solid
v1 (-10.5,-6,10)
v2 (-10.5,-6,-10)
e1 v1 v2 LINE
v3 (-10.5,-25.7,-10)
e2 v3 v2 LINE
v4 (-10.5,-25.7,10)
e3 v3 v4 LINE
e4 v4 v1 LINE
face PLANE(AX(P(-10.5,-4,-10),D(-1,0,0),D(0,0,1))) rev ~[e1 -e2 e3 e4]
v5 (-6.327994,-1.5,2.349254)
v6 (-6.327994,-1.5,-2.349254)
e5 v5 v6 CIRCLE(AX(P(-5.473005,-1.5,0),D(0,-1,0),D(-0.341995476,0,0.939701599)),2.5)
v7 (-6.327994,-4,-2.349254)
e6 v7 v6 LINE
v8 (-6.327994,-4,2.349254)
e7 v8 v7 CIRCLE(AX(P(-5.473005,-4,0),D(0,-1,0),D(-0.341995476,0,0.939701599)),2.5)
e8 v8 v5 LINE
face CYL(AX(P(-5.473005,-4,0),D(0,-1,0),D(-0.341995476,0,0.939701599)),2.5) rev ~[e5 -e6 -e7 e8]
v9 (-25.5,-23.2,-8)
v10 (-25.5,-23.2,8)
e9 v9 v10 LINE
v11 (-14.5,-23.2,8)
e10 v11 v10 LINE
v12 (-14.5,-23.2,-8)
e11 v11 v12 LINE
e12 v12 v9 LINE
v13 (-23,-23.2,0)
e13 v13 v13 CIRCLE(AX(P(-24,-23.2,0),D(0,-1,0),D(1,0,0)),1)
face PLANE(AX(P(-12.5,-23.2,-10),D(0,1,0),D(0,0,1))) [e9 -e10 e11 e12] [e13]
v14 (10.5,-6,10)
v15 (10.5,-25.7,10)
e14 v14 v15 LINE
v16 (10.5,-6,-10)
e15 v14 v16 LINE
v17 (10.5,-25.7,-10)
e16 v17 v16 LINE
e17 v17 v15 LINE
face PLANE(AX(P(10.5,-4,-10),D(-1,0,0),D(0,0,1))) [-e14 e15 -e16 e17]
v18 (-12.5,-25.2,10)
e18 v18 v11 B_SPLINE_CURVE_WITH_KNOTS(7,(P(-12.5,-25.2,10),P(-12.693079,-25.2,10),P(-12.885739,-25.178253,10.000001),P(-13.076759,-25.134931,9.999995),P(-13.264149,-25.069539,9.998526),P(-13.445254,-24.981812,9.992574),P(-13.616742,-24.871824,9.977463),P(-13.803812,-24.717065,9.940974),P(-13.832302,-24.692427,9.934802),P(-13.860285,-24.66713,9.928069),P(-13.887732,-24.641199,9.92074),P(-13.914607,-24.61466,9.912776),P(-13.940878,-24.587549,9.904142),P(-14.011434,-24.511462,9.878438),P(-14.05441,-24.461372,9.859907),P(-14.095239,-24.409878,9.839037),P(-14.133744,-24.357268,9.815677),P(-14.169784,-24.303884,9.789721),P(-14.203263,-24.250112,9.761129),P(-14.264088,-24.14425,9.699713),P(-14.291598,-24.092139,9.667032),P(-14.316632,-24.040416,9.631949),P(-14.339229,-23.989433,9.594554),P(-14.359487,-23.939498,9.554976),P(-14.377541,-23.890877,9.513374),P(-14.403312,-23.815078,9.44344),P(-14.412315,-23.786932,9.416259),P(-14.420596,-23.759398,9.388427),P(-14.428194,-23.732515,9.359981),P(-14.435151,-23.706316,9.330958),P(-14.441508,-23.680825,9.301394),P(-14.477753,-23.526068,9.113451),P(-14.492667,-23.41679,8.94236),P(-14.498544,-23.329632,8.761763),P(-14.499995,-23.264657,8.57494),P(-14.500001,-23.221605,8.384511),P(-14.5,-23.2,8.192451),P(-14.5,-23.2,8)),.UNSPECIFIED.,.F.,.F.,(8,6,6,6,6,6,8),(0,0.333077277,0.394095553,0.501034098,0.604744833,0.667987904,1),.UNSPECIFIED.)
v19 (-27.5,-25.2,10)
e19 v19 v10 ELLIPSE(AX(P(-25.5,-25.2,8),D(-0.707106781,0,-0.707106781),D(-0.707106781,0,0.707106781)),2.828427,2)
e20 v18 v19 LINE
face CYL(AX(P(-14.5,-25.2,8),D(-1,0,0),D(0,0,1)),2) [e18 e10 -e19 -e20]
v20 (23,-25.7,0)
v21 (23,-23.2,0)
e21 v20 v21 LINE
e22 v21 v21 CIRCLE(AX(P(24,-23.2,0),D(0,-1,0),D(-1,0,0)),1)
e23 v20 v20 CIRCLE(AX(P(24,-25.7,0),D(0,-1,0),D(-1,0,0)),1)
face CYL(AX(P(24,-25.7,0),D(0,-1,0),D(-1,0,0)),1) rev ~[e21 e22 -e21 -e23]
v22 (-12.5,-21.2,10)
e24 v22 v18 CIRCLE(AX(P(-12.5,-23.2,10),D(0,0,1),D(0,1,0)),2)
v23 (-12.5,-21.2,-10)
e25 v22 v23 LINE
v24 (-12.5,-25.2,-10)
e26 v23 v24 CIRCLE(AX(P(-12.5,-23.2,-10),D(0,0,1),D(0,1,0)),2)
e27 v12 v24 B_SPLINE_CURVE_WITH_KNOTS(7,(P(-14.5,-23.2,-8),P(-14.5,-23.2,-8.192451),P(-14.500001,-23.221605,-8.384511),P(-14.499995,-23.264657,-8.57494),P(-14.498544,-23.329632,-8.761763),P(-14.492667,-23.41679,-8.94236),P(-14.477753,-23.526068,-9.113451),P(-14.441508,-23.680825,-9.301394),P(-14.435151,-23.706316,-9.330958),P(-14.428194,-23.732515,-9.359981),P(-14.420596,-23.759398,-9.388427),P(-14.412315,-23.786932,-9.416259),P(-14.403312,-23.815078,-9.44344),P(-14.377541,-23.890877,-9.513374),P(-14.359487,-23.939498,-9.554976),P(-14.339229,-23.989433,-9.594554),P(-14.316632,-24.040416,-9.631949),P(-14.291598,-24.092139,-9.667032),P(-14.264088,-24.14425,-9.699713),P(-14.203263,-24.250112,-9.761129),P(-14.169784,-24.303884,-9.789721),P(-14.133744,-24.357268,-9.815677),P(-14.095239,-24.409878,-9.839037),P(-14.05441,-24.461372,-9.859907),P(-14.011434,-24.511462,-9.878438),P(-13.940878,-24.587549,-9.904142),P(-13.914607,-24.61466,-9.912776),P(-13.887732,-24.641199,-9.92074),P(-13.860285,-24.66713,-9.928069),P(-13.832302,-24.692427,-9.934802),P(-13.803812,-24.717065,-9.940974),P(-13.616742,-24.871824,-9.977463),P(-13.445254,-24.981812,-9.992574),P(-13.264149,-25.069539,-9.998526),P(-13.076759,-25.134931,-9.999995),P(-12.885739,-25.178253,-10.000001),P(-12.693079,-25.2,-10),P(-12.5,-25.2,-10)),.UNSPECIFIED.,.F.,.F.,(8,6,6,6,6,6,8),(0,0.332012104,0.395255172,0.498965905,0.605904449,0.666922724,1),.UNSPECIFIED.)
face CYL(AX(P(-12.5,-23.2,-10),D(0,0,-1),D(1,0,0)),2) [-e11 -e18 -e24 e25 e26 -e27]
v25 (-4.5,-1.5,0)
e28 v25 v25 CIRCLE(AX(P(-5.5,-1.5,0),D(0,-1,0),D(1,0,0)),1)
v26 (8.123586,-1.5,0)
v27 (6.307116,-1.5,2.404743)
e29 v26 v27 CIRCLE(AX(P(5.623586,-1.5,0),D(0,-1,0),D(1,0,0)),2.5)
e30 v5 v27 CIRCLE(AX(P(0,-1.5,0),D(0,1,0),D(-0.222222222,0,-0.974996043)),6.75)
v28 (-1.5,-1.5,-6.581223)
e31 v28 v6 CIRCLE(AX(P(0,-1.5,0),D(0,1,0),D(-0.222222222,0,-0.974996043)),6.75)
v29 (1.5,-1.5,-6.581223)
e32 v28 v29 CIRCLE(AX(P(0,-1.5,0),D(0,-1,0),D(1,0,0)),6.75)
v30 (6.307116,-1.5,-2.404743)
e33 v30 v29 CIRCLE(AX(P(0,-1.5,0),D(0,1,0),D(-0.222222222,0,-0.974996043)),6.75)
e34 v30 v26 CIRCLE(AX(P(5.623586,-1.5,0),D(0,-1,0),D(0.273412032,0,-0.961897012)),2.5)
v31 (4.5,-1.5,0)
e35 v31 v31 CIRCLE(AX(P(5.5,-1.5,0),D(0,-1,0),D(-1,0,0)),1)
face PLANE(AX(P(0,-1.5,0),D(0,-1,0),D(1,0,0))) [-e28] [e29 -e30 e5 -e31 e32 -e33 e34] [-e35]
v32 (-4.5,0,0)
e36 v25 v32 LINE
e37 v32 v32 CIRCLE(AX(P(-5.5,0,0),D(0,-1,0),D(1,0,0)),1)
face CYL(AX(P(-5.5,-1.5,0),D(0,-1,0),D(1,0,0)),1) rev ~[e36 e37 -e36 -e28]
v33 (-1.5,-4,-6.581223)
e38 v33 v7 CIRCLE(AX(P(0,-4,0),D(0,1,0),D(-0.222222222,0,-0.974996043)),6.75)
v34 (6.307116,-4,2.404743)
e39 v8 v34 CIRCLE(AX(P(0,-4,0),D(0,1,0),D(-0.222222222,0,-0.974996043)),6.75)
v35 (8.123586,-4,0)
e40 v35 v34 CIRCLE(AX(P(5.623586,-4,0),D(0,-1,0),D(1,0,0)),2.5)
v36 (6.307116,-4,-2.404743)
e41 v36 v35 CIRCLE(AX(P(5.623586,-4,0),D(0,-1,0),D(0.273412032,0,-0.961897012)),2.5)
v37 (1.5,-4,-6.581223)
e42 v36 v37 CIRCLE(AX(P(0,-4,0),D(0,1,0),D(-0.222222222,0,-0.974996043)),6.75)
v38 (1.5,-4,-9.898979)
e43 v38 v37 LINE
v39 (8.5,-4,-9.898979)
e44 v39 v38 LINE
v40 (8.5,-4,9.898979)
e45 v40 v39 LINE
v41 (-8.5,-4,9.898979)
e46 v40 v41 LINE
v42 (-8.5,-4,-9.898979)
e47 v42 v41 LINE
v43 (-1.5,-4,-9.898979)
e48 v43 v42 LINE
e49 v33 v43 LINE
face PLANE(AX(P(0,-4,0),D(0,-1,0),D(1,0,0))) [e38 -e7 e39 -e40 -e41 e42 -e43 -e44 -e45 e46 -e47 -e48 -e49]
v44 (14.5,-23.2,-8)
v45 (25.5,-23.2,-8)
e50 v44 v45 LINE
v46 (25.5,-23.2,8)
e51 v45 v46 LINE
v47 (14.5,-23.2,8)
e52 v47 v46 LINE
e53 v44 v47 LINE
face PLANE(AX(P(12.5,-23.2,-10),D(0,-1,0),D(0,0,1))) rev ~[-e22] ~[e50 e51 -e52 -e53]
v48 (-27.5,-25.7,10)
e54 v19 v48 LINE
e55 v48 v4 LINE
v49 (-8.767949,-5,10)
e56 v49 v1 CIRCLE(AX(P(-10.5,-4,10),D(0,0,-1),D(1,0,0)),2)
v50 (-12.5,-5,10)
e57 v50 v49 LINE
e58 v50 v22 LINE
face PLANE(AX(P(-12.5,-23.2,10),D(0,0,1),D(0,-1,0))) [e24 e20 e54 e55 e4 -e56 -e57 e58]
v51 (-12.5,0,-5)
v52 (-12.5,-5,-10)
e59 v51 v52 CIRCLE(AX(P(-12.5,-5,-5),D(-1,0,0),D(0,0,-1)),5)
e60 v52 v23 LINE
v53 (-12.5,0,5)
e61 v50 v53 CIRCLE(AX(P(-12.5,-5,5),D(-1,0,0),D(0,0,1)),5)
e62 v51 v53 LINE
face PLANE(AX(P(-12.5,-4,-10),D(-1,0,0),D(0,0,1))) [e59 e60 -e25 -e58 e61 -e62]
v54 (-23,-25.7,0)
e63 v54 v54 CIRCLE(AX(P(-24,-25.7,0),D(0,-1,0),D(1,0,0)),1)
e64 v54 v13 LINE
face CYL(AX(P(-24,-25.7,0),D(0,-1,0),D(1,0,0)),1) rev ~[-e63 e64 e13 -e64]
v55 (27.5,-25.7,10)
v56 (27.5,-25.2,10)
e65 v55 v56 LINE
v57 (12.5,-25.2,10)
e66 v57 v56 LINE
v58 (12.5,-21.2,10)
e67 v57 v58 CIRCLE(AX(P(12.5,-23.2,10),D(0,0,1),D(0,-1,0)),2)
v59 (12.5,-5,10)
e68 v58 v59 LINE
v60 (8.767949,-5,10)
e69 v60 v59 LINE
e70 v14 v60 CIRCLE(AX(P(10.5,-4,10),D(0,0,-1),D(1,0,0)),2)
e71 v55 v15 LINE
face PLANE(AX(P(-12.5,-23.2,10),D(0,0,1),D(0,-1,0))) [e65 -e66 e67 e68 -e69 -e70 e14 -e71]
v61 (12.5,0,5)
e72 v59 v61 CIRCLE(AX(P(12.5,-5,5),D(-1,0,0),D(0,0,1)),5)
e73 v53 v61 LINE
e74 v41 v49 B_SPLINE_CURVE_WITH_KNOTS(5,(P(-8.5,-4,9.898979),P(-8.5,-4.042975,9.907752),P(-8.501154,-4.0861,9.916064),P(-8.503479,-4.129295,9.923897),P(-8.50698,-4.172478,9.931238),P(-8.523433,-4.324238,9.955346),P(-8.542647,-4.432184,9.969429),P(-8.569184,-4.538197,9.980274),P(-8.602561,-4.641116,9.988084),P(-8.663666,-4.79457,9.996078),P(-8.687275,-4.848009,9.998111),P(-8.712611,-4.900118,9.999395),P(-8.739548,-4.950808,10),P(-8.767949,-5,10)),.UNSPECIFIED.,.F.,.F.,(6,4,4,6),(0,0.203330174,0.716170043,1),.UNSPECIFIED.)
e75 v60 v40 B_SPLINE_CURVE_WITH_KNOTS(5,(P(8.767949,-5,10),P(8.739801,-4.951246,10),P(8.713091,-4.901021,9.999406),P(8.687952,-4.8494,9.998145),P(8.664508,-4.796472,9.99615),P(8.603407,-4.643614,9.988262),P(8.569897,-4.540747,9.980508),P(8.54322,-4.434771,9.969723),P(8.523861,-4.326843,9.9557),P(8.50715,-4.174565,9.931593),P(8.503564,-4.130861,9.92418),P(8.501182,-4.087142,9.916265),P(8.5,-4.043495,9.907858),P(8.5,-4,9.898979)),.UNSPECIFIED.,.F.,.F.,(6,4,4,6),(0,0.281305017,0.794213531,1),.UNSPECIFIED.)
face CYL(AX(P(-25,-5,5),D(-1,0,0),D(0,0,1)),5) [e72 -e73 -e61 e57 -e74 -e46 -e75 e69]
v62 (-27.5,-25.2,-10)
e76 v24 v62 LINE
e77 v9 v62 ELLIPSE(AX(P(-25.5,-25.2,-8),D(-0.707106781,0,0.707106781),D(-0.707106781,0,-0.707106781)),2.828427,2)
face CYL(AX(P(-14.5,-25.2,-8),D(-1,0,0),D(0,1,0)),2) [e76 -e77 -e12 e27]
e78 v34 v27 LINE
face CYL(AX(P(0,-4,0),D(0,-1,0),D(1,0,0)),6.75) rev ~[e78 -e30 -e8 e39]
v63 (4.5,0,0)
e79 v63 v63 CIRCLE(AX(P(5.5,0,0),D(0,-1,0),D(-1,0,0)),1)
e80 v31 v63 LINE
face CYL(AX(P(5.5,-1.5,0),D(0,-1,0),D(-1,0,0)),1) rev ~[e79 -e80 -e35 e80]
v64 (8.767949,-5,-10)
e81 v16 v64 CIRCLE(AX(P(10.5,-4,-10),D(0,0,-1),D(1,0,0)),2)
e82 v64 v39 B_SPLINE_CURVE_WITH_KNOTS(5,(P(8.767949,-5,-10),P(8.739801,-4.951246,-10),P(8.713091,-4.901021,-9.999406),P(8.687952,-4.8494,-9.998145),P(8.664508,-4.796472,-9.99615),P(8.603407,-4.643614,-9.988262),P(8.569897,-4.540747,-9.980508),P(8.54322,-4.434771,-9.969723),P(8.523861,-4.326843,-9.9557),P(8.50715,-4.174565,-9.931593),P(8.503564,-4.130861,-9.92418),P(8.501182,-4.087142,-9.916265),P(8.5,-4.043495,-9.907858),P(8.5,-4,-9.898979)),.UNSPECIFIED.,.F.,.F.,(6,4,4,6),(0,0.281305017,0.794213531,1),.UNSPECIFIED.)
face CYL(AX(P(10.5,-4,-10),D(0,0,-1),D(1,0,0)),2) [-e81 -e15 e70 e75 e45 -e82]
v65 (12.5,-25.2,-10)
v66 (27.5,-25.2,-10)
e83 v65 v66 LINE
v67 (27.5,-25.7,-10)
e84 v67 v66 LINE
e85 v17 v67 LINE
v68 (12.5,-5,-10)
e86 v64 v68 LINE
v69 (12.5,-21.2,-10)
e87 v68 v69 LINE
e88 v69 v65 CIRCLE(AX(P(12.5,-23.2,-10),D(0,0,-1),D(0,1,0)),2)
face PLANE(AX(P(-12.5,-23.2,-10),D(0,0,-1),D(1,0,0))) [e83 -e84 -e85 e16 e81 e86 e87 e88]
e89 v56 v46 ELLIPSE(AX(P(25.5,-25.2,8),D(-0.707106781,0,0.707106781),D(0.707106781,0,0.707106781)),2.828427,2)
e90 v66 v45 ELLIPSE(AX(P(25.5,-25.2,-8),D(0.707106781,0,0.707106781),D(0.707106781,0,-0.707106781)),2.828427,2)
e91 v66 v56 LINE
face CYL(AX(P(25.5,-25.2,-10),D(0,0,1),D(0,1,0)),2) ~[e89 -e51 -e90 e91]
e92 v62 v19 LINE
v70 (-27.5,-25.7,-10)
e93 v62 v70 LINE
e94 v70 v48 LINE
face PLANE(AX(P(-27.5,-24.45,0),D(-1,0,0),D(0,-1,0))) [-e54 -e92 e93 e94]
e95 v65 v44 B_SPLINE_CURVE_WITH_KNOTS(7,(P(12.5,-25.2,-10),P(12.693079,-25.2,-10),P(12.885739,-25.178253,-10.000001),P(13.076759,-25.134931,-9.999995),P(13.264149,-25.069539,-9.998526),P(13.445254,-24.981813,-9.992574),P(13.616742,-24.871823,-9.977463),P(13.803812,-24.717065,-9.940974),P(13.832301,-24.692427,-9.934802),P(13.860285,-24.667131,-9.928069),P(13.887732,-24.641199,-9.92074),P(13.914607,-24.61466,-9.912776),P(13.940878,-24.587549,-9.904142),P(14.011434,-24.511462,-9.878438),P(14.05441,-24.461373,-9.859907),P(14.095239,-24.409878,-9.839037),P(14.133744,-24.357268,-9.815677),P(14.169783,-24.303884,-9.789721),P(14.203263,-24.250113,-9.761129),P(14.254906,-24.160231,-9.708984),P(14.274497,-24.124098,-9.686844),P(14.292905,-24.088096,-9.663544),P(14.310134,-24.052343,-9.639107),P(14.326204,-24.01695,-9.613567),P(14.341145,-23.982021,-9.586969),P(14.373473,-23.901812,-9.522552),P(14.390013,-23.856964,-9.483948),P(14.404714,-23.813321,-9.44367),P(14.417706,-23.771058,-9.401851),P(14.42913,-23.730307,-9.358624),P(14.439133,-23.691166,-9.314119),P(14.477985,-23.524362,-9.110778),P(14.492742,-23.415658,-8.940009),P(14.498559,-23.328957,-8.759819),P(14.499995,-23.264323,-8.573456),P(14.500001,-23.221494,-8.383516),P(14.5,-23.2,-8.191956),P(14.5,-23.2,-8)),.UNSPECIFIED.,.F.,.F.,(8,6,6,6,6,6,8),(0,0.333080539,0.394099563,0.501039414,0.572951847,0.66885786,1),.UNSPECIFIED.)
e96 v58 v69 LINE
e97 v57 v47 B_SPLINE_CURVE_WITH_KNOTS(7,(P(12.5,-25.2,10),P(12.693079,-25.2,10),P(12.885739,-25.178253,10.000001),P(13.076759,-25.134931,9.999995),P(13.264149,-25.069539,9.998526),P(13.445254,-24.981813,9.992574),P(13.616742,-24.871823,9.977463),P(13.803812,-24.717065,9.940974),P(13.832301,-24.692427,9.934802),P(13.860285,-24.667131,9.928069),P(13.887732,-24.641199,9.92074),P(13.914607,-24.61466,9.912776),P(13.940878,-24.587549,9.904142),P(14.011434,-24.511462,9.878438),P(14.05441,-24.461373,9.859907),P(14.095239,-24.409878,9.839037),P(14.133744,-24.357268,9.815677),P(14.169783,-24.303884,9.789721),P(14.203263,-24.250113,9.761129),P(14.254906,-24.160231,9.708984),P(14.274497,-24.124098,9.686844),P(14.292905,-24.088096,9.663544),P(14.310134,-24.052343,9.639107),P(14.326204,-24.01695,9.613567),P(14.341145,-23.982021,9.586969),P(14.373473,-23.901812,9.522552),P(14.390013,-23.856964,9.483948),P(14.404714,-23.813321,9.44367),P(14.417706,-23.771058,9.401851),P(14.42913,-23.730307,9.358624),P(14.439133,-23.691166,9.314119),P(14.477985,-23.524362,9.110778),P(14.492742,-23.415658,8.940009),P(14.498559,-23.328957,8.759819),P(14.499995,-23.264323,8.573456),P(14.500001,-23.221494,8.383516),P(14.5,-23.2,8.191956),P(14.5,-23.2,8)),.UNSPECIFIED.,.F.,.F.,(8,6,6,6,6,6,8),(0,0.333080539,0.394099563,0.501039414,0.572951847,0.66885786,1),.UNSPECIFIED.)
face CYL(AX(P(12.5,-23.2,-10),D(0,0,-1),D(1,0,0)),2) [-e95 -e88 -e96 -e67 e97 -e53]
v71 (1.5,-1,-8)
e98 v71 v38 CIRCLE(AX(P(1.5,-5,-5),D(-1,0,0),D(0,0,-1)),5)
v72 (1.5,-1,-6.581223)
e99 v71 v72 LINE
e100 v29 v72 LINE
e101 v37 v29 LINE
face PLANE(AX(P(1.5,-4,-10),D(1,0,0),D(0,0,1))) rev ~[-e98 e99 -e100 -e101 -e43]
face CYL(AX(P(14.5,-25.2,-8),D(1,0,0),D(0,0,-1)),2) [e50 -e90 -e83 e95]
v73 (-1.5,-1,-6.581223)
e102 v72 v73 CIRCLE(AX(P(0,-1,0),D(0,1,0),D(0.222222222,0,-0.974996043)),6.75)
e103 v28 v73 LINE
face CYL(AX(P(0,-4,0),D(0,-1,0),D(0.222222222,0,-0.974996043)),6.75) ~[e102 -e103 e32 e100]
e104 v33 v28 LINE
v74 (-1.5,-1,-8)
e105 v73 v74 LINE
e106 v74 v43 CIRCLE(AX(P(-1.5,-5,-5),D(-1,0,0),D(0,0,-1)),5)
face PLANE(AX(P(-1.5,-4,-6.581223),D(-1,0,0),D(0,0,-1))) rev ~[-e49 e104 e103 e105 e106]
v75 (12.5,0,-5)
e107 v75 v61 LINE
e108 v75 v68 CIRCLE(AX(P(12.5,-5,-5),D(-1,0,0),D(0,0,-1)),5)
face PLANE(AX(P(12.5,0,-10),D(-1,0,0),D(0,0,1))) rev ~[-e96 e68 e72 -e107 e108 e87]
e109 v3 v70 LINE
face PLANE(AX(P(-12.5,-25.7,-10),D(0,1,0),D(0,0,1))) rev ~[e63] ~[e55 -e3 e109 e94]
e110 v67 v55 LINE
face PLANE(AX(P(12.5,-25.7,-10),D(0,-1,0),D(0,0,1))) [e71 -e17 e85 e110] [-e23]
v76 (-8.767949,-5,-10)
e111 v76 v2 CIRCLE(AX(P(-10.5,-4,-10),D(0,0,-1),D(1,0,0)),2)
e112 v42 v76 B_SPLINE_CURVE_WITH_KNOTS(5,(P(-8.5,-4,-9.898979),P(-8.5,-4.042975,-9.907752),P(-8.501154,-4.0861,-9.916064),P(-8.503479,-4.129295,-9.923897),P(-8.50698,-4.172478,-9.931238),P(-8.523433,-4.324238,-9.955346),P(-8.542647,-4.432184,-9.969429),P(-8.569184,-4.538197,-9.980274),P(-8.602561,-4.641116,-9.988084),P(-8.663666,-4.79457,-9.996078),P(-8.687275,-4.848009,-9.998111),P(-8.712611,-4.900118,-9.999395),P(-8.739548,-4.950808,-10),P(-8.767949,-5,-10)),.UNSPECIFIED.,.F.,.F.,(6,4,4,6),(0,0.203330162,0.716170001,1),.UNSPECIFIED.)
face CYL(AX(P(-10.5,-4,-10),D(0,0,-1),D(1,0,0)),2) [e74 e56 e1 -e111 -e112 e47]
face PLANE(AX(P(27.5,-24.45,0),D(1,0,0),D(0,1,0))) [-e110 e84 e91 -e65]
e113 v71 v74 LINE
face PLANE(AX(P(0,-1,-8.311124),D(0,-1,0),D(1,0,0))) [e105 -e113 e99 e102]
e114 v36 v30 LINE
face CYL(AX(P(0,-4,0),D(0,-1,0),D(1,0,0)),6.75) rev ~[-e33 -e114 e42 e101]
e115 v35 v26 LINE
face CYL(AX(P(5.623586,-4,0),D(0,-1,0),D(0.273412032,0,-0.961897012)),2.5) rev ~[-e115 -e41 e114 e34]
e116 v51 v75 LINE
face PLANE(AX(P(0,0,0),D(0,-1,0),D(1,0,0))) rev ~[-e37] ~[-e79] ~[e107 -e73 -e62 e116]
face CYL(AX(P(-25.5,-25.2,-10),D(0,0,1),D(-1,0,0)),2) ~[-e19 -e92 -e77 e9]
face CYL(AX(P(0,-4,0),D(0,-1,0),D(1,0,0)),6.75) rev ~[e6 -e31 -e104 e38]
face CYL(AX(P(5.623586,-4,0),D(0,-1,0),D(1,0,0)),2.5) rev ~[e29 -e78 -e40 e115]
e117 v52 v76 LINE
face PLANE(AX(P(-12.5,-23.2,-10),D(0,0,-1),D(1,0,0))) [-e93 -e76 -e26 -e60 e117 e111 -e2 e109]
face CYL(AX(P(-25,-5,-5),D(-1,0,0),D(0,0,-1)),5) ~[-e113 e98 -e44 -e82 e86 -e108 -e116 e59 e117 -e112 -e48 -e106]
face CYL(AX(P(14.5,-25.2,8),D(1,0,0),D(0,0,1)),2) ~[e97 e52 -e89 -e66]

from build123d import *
from build123d import SkipClean  # not in build123d's __all__

# Parameters (mm, degrees)
F0_W         = 25
F0_H         = 20
F1_DEPTH     = 4
F2_R         = 6.75
F3_DEPTH     = 2.5
F5_DEPTH     = 3
F6_R         = 1
F7_DEPTH     = 25
F9_DEPTH     = 2.5
F10_W        = 2
F10_H        = 20
F11_DEPTH    = 21.7
F12_W        = 2.5
F12_H        = 20
F13_DEPTH    = 15
F14_W        = 2.5
F14_H        = 20
F15_DEPTH    = 15
F16_R        = 2
F17_DEPTH    = 20
F18_T1_DEPTH = 50
F19_R        = 2
F20_R        = 1
F21_DEPTH    = 25


# Not quite as in the source:
# - a fillet or chamfer that OpenCascade refuses, or shapes differently, is made with other operations: its cross-section is extruded or revolved along the edge and cut away or added


with BuildPart() as f1:
    # F0 (on Front) → F1 (new body)
    with BuildSketch(Plane.XZ):
        Rectangle(F0_W, F0_H)
    extrude(amount=F1_DEPTH)

    # F2 (on face) → F3 (cut)
    with BuildSketch(Plane.XZ.offset(4)):
        Circle(F2_R)
    extrude(amount=-F3_DEPTH, mode=Mode.SUBTRACT)

    # F4 (on face) → F5 (cut)
    with BuildSketch(Plane.XZ.offset(4)):
        with BuildLine():
            Line((-1.5, -10), (1.5, -10))
            Line((1.5, -10), (1.5, -6.5812232905))
            ThreePointArc((1.5, -6.5812232905), (0, -6.75), (-1.5, -6.5812232905))
            Line((-1.5, -6.5812232905), (-1.5, -10))
        make_face()
    extrude(amount=-F5_DEPTH, mode=Mode.SUBTRACT)

    # F6 (on face) → F7 (cut)
    with BuildSketch(Plane.XZ.offset(1.5)):
        with Locations((-5.5, 0)):
            Circle(F6_R)
        with BuildLine():
            ThreePointArc((6.5, 0), (5.5, 1), (4.5, 0))
            ThreePointArc((4.5, 0), (5.5, -1), (6.5, 0))
        make_face()
    extrude(amount=-F7_DEPTH, mode=Mode.SUBTRACT)

    # F8 (on face) → F9 (cut)
    with BuildSketch(Plane.XZ.offset(4)):
        with BuildLine():
            ThreePointArc((-6.3279938101, -2.3492539963), (-6.75, 0), (-6.3279938101, 2.3492539963))
            ThreePointArc((-6.3279938101, 2.3492539963), (-7.9730051197, 0), (-6.3279938101, -2.3492539963))
        make_face()
        with BuildLine():
            ThreePointArc((6.3071160898, -2.4047425289), (6.75, 0), (6.3071160898, 2.4047425289))
            ThreePointArc((6.3071160898, 2.4047425289), (3.1235860102, 0), (6.3071160898, -2.4047425289))
        make_face()
        with BuildLine():
            ThreePointArc((8.1235860102, 0), (7.6184325204, 1.5068468404), (6.3071160898, 2.4047425289))
            ThreePointArc((6.3071160898, 2.4047425289), (6.75, 0), (6.3071160898, -2.4047425289))
            ThreePointArc((6.3071160898, -2.4047425289), (7.6184325204, -1.5068468404), (8.1235860102, 0))
        make_face()
    extrude(amount=-F9_DEPTH, mode=Mode.SUBTRACT)

    # F10 (on face) → F11 (join)
    with BuildSketch(Plane.XZ.offset(4)):
        with Locations((-11.5, 0)):
            Rectangle(F10_W, F10_H)
        with Locations((11.5, 0)):
            Rectangle(F10_W, F10_H)
    extrude(amount=F11_DEPTH)

    # F12 (on face) → F13 (join)
    with BuildSketch(Plane.YZ.offset(12.5)):
        with Locations((-24.45, 0)):
            Rectangle(F12_W, F12_H)
    extrude(amount=F13_DEPTH)

    # F14 (on face) → F15 (join)
    with BuildSketch(Plane(origin=(-12.5, 0, 0), x_dir=(0, -1, 0), z_dir=(-1, 0, 0))):
        with Locations((24.45, 0)):
            Rectangle(F14_W, F14_H)
    extrude(amount=F15_DEPTH)

    # F16 (on face) → F17 (join)
    with BuildSketch(Plane(origin=(0, 0, -10), x_dir=(1, 0, 0), z_dir=(0, 0, -1))):
        with Locations((-12.5, 23.2)):
            Circle(F16_R)
        with Locations((12.5, 23.2)):
            Circle(F16_R)
        with Locations((-10.5, 4)):
            Circle(F16_R)
        with Locations((10.5, 4)):
            Circle(F16_R)
    extrude(amount=-F17_DEPTH)

    # F18: fillet of radius 5 on 2 edges, made by hand

    # F18_s2 → F18_t1 (cut)
    with BuildSketch(Plane.YZ.offset(-25)):
        with BuildLine():
            ThreePointArc((-5, 10), (-1.4644660941, 8.5355339059), (0, 5))
            Line((0, 5), (0, 10))
            Line((0, 10), (-5, 10))
        make_face()
        with BuildLine():
            ThreePointArc((-5, -10), (-1.4644660941, -8.5355339059), (0, -5))
            Line((0, -5), (0, -10))
            Line((0, -10), (-5, -10))
        make_face()
    extrude(amount=F18_T1_DEPTH, mode=Mode.SUBTRACT)

    # F19
    f19_edges = [f1.edges().sort_by_distance(p)[0] for p in [
        (21, -23.2, -10),
        (21, -23.2, 10),
        (-21, -23.2, -10),
        (-21, -23.2, 10),
        (27.5, -23.2, 0),
        (-27.5, -23.2, 0),
    ]]
    fillet(f19_edges, radius=F19_R)

    # F20 (on face) → F21 (cut)
    with BuildSketch(Plane.XZ.offset(25.7)):
        with Locations((-24, 0)):
            Circle(F20_R)
        with BuildLine():
            ThreePointArc((25, 0), (24, 1), (23, 0))
            ThreePointArc((23, 0), (24, -1), (25, 0))
        make_face()
    with SkipClean():  # cleaning this boolean's faces spoils the solid; the shape is the same uncleaned
        extrude(amount=-F21_DEPTH, mode=Mode.SUBTRACT)


solid = f1.part
